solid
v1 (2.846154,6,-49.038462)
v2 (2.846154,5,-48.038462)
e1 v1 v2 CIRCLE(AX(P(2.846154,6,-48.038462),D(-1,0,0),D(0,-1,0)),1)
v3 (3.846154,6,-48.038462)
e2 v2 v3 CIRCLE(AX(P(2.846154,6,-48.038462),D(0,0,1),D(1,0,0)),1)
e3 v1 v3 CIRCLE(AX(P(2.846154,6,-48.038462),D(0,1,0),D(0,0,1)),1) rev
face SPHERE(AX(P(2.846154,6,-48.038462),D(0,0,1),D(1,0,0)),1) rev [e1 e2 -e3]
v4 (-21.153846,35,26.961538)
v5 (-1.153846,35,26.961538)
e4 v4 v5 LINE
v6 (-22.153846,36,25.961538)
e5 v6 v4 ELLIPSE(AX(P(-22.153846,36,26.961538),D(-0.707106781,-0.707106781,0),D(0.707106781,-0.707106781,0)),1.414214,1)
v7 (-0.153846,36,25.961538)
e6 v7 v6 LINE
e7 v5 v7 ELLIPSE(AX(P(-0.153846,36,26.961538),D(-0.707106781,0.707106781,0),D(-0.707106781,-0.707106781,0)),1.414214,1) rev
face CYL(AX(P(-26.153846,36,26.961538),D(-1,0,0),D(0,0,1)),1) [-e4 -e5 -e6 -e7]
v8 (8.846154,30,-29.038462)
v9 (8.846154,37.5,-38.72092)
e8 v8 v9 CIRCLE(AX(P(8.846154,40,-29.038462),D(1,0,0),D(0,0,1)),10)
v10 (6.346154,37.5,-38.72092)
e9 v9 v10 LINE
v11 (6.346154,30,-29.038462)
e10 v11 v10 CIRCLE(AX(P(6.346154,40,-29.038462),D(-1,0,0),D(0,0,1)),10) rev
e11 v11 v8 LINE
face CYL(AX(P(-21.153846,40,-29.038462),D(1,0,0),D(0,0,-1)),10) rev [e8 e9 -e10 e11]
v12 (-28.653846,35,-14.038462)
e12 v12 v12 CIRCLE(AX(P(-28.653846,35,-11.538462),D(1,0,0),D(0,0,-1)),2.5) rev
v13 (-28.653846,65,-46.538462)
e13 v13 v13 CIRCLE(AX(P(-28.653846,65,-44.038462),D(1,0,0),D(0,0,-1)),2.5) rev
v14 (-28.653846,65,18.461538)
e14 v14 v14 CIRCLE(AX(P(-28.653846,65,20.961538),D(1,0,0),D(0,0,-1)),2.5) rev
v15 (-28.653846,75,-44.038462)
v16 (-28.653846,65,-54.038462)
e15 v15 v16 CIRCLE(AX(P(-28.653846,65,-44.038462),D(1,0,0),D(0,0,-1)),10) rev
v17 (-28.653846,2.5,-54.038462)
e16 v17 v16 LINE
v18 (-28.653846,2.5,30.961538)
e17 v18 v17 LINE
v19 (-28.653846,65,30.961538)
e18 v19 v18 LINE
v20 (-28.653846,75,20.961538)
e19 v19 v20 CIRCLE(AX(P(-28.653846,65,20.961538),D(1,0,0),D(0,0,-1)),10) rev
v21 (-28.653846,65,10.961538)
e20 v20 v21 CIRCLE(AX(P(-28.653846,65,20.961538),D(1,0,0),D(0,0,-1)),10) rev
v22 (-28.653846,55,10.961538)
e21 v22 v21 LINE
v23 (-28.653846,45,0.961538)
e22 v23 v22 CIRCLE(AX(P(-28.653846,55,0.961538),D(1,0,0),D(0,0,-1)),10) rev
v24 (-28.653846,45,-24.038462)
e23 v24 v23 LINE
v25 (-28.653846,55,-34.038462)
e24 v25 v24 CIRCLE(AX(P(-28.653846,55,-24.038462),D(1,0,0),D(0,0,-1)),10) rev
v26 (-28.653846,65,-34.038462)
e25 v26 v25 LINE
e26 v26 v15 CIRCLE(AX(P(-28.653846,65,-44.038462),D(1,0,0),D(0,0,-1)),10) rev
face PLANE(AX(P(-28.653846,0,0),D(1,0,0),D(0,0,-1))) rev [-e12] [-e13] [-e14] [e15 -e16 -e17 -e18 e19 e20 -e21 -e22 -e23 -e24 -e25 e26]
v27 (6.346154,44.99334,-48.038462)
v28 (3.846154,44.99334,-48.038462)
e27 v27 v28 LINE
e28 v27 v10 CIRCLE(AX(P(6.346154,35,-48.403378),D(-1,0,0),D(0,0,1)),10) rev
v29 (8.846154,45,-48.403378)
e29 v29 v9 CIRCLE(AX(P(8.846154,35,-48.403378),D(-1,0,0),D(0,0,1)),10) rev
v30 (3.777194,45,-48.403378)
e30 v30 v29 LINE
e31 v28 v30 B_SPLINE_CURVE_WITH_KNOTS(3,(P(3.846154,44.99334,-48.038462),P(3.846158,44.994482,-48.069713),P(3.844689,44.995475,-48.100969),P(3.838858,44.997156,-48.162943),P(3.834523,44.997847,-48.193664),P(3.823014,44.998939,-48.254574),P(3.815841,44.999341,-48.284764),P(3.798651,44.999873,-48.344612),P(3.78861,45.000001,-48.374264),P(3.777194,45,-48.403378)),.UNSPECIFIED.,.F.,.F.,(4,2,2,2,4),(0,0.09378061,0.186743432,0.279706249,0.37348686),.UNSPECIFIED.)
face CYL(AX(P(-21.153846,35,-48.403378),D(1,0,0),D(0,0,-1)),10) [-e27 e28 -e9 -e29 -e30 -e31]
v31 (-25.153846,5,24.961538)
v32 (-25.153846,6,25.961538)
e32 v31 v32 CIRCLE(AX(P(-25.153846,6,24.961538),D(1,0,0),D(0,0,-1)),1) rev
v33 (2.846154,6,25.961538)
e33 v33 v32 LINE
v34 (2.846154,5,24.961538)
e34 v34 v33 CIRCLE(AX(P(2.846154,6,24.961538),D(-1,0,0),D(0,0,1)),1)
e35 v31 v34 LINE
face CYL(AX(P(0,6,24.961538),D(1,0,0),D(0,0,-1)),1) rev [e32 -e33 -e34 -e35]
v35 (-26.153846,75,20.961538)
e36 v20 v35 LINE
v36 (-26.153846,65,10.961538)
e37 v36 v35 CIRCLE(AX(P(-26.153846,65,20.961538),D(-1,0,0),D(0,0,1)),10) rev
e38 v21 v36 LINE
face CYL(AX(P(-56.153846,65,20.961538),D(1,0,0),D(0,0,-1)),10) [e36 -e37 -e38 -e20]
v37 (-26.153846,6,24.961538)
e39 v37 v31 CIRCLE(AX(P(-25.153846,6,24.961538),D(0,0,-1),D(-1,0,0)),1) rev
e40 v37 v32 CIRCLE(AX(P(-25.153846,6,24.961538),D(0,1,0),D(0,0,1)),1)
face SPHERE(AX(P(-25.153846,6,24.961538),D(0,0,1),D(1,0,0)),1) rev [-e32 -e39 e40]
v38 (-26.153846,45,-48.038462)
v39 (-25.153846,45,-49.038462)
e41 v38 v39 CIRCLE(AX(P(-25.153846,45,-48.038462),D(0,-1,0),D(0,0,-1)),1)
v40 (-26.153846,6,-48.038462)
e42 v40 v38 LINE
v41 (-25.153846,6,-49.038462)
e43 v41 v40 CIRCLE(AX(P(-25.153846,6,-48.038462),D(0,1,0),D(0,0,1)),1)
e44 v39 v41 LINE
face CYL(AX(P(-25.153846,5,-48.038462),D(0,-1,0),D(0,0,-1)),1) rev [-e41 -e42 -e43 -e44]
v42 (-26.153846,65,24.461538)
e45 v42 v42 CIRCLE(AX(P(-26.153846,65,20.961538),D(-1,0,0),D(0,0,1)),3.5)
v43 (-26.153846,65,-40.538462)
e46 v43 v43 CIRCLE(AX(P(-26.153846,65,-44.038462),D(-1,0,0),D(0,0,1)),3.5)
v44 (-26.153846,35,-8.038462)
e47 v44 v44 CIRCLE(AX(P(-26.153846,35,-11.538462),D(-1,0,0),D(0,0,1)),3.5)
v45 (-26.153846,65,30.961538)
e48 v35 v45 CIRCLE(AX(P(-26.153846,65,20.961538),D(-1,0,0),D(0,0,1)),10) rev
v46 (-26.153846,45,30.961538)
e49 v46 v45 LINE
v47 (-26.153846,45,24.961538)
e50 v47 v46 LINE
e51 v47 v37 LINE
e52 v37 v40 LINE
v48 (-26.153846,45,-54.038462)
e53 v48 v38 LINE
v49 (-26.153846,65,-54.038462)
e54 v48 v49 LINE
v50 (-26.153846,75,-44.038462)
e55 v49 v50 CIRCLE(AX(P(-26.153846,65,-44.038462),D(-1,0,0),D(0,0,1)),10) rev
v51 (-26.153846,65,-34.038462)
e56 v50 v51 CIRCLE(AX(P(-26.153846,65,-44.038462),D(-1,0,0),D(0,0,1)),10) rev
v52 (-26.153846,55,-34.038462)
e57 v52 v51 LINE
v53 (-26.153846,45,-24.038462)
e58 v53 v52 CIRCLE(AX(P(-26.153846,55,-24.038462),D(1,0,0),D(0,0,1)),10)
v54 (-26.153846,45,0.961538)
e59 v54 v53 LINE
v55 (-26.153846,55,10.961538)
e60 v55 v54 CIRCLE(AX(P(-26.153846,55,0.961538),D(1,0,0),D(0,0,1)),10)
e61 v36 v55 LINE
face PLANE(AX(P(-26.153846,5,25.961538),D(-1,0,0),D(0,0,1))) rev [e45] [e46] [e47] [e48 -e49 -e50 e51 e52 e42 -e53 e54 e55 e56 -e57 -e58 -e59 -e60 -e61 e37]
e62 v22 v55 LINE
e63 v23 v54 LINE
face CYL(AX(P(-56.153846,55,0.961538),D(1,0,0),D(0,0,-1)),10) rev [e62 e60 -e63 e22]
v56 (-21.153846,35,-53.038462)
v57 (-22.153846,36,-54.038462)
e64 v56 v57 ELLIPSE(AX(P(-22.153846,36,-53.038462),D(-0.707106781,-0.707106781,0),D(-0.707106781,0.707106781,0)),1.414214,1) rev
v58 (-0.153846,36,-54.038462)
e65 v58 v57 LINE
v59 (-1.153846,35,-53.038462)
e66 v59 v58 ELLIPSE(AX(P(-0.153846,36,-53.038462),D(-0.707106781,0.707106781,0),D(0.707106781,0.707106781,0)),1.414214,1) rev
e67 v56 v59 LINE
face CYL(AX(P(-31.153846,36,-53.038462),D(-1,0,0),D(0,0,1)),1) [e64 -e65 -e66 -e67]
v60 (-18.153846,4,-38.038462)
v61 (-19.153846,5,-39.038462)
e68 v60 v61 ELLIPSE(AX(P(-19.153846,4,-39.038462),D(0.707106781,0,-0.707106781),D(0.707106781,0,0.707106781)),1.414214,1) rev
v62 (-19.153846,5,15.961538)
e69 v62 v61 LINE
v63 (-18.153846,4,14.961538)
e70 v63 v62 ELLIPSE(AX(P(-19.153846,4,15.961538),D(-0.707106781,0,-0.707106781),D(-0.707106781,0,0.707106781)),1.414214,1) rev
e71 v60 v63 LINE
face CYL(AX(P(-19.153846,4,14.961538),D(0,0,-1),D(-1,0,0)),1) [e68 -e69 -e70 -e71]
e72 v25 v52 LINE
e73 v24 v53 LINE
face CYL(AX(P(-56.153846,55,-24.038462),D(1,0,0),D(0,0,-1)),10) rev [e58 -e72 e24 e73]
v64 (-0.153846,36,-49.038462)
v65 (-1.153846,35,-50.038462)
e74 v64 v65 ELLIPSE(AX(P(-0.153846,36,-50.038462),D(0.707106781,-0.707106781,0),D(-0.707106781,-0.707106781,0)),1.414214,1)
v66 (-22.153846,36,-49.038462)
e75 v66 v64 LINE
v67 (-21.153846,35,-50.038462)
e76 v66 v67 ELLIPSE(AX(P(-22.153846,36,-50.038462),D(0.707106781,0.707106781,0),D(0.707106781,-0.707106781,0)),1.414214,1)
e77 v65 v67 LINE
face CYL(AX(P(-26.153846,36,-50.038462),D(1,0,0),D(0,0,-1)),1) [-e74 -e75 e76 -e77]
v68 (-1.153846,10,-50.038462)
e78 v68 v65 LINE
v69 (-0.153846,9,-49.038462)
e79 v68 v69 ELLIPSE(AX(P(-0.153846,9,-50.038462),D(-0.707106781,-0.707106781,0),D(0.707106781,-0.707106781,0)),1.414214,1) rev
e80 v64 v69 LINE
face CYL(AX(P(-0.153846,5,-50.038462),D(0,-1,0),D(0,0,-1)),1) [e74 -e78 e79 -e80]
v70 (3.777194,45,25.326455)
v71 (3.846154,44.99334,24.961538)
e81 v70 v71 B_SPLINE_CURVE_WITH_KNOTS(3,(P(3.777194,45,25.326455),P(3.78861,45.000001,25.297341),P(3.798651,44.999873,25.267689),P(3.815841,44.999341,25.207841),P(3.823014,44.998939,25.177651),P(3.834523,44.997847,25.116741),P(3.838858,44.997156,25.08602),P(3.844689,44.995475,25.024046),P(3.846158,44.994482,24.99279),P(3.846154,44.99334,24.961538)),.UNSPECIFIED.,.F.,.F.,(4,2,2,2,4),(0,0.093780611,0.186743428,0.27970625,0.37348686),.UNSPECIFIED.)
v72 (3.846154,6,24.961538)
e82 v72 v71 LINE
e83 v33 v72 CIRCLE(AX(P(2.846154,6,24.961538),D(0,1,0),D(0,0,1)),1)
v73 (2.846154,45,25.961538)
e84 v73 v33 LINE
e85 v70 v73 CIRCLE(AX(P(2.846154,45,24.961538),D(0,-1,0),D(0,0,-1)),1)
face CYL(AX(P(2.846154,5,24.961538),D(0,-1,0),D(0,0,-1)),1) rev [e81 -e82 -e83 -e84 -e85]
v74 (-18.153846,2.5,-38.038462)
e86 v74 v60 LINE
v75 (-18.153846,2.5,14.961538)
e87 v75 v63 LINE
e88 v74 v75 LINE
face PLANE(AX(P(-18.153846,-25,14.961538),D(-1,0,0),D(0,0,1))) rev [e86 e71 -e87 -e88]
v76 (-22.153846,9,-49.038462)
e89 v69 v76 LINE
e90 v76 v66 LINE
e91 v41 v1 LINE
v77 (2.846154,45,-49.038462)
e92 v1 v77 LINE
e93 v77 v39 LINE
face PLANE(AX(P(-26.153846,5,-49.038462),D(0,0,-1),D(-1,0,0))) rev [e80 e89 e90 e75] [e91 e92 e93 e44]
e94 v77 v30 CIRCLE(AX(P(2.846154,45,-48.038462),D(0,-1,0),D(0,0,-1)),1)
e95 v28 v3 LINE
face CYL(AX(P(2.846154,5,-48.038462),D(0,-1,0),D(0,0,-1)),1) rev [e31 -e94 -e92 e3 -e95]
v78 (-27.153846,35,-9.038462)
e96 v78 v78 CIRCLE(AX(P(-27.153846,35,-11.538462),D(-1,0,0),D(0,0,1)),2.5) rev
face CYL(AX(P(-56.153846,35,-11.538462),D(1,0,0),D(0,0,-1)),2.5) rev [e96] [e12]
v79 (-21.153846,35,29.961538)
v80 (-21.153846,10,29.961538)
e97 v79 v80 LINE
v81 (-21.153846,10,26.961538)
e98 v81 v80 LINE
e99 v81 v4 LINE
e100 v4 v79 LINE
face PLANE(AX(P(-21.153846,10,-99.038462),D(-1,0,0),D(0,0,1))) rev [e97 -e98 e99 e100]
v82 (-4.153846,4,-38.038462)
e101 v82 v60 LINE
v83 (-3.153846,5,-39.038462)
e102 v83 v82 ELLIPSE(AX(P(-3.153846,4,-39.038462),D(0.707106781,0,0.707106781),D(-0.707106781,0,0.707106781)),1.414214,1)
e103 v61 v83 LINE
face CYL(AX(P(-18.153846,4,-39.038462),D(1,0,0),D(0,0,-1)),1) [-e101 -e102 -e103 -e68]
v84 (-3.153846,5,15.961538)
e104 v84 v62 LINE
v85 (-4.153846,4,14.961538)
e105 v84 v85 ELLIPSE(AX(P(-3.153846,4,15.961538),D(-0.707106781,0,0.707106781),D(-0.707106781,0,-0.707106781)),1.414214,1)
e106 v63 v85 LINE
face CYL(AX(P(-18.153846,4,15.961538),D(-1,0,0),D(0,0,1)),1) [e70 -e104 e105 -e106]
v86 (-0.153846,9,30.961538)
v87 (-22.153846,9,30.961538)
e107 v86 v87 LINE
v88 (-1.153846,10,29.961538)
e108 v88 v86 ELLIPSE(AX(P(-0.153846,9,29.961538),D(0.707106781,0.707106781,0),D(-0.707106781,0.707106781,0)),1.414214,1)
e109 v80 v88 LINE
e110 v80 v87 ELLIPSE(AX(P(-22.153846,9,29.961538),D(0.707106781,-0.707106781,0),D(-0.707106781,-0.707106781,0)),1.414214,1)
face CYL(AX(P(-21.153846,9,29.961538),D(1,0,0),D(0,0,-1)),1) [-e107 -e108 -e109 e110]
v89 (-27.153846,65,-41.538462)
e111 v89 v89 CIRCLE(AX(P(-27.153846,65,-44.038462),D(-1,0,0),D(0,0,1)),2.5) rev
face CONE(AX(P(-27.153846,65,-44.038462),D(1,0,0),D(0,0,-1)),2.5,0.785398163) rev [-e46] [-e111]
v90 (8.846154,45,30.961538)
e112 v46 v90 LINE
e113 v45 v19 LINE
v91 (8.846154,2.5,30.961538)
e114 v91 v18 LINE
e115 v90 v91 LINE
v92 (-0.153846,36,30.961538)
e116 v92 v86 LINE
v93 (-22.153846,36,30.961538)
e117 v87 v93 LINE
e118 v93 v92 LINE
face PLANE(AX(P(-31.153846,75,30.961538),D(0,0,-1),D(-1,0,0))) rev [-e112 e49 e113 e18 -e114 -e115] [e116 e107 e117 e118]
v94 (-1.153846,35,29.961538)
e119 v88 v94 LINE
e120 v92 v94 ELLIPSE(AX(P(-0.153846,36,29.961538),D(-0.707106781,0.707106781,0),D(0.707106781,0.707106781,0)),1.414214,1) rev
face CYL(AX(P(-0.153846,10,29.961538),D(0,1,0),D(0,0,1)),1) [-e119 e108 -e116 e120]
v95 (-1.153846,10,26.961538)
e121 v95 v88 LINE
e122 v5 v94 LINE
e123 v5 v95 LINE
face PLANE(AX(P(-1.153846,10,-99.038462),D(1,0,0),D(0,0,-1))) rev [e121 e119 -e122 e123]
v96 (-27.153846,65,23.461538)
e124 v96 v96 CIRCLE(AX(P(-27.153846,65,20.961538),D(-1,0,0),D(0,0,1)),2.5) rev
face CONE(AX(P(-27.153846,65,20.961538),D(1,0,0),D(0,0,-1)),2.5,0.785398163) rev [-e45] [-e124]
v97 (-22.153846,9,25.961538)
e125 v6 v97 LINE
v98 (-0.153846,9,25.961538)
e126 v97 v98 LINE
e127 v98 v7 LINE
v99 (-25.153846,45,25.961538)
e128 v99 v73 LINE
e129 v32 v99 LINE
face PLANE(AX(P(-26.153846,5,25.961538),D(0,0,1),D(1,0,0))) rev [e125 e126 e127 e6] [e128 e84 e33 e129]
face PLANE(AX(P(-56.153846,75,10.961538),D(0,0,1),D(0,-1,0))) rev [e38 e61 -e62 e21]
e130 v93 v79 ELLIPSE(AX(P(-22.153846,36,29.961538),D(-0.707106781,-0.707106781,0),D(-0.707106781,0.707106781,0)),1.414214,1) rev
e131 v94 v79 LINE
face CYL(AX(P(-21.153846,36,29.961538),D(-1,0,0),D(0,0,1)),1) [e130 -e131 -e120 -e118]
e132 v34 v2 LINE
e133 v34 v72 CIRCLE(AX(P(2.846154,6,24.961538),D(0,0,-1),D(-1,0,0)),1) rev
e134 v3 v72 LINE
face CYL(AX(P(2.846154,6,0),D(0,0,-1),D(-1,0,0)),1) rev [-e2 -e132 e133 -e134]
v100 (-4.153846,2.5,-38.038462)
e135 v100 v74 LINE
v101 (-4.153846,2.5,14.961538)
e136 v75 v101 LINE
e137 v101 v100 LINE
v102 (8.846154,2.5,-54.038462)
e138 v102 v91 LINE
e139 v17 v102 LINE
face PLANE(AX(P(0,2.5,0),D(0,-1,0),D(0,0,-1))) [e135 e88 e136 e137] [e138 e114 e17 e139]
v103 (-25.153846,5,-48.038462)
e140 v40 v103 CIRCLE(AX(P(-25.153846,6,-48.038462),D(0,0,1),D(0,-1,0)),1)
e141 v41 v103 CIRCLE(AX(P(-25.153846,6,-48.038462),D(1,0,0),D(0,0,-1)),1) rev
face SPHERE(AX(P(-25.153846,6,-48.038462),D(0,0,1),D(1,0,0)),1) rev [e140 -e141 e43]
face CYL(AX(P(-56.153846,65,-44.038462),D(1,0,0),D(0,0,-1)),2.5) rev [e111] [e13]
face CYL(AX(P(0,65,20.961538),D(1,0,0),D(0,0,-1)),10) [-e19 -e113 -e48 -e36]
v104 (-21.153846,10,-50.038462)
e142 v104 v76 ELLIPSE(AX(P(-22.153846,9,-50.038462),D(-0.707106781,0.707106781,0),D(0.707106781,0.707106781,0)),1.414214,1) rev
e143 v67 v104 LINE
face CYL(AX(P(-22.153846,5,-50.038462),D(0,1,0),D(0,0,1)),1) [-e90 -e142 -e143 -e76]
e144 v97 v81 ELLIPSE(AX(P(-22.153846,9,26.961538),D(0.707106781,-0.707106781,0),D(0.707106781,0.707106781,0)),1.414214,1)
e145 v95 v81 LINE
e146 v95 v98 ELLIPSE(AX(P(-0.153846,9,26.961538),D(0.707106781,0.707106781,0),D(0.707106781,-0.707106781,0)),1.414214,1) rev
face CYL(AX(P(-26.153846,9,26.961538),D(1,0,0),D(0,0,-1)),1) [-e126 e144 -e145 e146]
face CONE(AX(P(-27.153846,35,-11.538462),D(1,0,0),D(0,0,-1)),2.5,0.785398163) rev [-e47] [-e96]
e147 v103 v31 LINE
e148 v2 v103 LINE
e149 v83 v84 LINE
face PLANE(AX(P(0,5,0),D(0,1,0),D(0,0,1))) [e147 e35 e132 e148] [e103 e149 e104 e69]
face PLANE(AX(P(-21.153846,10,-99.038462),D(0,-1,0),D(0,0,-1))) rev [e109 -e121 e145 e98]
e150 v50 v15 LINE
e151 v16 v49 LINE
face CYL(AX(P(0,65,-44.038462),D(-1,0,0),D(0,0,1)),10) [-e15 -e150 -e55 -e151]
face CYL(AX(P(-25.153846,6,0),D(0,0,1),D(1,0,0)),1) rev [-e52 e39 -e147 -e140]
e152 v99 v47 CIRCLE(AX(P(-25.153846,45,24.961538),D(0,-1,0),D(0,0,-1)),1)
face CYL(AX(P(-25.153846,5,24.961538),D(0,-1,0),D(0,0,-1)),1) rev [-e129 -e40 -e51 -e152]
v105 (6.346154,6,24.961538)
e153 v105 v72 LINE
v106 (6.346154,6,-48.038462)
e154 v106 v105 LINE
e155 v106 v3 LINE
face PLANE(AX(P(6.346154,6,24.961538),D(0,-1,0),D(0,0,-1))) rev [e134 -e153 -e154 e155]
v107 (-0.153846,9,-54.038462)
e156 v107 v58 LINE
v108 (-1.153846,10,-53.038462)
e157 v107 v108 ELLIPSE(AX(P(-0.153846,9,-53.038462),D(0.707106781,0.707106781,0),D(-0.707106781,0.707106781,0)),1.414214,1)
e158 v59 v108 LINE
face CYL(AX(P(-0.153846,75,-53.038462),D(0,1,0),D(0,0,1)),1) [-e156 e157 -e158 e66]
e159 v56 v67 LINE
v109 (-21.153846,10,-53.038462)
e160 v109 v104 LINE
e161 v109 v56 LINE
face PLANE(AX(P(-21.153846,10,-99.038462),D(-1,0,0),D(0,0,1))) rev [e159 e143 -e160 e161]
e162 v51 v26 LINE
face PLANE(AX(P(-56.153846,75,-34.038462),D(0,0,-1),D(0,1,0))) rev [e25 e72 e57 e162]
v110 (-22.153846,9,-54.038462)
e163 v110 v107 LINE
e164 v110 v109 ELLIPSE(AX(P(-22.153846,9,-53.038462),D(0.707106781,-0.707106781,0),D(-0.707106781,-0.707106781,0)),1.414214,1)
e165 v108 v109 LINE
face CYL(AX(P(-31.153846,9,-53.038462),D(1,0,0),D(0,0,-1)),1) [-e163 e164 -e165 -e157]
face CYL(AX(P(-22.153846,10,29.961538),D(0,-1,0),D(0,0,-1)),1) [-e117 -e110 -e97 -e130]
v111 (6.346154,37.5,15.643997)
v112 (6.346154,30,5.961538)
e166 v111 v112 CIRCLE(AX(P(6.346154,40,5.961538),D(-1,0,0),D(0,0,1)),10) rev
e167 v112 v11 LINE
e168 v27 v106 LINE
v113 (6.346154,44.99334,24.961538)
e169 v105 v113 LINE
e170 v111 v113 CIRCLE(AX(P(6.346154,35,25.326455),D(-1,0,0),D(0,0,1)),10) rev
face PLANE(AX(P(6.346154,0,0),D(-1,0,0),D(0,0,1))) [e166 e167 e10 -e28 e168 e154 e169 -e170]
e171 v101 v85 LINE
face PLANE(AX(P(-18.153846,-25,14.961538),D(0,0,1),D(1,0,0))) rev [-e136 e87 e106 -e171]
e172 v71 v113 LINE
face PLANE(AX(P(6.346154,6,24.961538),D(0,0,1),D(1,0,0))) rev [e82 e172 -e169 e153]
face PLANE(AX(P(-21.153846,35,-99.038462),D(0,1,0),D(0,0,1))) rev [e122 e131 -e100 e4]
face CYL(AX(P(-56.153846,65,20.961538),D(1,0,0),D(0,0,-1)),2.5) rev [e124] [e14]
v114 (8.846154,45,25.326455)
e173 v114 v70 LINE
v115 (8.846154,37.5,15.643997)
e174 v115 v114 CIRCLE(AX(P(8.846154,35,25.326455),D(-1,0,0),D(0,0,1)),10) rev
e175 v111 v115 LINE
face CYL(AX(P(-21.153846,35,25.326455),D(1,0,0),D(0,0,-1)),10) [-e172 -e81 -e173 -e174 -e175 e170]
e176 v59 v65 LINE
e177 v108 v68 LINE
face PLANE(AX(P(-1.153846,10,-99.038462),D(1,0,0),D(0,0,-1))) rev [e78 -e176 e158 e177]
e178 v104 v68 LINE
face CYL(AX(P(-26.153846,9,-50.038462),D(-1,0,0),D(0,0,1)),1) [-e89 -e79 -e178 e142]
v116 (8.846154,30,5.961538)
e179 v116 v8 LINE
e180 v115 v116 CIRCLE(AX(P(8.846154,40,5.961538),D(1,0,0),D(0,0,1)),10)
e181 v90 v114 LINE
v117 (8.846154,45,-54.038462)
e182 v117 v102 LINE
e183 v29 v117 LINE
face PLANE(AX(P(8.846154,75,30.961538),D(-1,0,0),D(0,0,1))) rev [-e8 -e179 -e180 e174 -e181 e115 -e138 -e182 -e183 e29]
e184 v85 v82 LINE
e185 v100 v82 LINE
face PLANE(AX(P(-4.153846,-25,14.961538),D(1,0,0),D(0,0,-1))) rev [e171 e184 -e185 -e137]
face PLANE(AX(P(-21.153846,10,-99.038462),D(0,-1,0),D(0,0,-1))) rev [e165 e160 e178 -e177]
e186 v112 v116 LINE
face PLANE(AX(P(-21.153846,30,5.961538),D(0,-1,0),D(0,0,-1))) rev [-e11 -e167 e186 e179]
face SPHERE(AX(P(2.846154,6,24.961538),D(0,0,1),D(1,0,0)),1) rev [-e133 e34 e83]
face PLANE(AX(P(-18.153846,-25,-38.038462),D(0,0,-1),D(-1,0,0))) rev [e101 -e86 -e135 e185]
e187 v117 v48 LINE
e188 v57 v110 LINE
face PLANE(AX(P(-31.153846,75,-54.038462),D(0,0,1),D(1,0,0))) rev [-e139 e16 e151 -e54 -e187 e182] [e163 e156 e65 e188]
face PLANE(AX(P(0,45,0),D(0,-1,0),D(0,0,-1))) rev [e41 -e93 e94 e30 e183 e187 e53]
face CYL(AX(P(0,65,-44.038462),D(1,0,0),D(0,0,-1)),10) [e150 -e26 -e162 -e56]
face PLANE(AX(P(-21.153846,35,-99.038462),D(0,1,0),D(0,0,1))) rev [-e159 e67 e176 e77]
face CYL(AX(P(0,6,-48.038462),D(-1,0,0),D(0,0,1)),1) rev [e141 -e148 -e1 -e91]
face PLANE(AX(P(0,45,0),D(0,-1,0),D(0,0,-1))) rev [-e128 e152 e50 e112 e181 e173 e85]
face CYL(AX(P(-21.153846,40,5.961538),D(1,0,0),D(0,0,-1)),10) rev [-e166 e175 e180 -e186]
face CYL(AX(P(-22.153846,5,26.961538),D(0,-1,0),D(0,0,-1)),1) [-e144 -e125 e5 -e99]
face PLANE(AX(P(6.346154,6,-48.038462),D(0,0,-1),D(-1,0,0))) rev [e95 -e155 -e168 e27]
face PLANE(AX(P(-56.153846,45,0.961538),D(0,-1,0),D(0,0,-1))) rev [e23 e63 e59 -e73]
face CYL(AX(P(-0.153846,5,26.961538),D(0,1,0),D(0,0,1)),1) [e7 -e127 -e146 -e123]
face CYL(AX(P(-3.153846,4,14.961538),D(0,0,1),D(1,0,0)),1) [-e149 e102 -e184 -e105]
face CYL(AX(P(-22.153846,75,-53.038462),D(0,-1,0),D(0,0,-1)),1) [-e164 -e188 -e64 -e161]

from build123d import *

# Parameters (mm, degrees)
SKETCH1_W           = 40
SKETCH1_H           = 85
BOSS_EXTRUDE1_DEPTH = 75
SKETCH3_OUTSIDE_W   = 66.042
SKETCH3_OUTSIDE_H   = 111.042
SKETCH3_OUTSIDE_W_2 = 40
SKETCH3_OUTSIDE_H_2 = 85
SKETCH3_OUTSIDE_W_3 = 30
SKETCH3_OUTSIDE_H_3 = 75
CUT_EXTRUDE2_DEPTH  = 70
SKETCH4_W           = 35
SKETCH4_H           = 85
CUT_EXTRUDE3_DEPTH  = 30
FILLET1_R           = 10
SKETCH5_R           = 2.5
CUT_EXTRUDE4_DEPTH  = 30
CHAMFER1_SIZE       = 1
CUT_EXTRUDE5_DEPTH  = 30
FILLET2_R           = 1
FILLET3_R           = 10
SKETCH7_W           = 14
SKETCH7_H           = 53
CUT_EXTRUDE6_DEPTH  = 30
FILLET4_R           = 1
CUT_EXTRUDE7_DEPTH  = 30
FILLET5_R           = 10
SKETCH9_R           = 2.5
CUT_EXTRUDE8_DEPTH  = 30
CHAMFER2_SIZE       = 1
SKETCH10_W          = 20
SKETCH10_H          = 25
CUT_EXTRUDE9_DEPTH  = 130
FILLET6_R           = 1
FILLET7_R           = 1
SKETCH12_W          = 99.145482585
SKETCH12_H          = 91.596568109
CUT_EXTRUDE11_DEPTH = 2.5
SKETCH13_W          = 51.22831634
SKETCH13_H          = 105.793314496
CUT_EXTRUDE12_DEPTH = 2.5
SKETCH14_W          = 73
SKETCH14_H          = 70.039653543
CUT_EXTRUDE13_DEPTH = 2.5


# Some blends are built 0.0001 mm under size
with BuildPart() as part:
    # Sketch1 → Boss-Extrude1 (new body)
    with BuildSketch(Plane(origin=(0, 0, 0), x_dir=(1, 0, 0), z_dir=(0, 1, 0))):
        with Locations((-11.153846154, 11.538461538)):
            Rectangle(SKETCH1_W, SKETCH1_H)
    extrude(amount=BOSS_EXTRUDE1_DEPTH)

    # Sketch3 outside → Cut-Extrude2 (cut)
    # profile 1 of 2: a face of its own
    with BuildSketch(Plane(origin=(0, 75, 0), x_dir=(1, 0, 0), z_dir=(0, 1, 0))):
        with Locations((-11.154, 11.538)):
            Rectangle(SKETCH3_OUTSIDE_W, SKETCH3_OUTSIDE_H)
        with Locations((-11.153846154, 11.538461538)):
            Rectangle(SKETCH3_OUTSIDE_W_2, SKETCH3_OUTSIDE_H_2, mode=Mode.SUBTRACT)
    # profile 2 of 2: a face of its own
    with BuildSketch(Plane(origin=(0, 75, 0), x_dir=(1, 0, 0), z_dir=(0, 1, 0))):
        with Locations((-11.153846154, 11.538461538)):
            Rectangle(SKETCH3_OUTSIDE_W_3, SKETCH3_OUTSIDE_H_3)
    extrude(amount=-CUT_EXTRUDE2_DEPTH, mode=Mode.SUBTRACT)

    # Sketch4 → Cut-Extrude3 (cut)
    with BuildSketch(Plane(origin=(0, 75, 0), x_dir=(1, 0, 0), z_dir=(0, 1, 0))):
        with Locations((-8.653846154, 11.538461538)):
            Rectangle(SKETCH4_W, SKETCH4_H)
    extrude(amount=-CUT_EXTRUDE3_DEPTH, mode=Mode.SUBTRACT)

    # Fillet1
    fillet1_edges = [part.edges().sort_by_distance(p)[0] for p in [
        (-28.653846154, 75, -54.038461538),
        (-28.653846154, 75, 30.961538462),
    ]]
    fillet(fillet1_edges, radius=FILLET1_R)

    # Sketch5 → Cut-Extrude4 (cut)
    with BuildSketch(Plane(origin=(-26.153846154, 0, 0), x_dir=(0, 0, -1), z_dir=(1, 0, 0))):
        with Locations((-20.961538462, 65)):
            Circle(SKETCH5_R)
        with Locations((44.038461538, 65)):
            Circle(SKETCH5_R)
    extrude(amount=-CUT_EXTRUDE4_DEPTH, mode=Mode.SUBTRACT)

    # Chamfer1
    chamfer1_edges = [part.edges().sort_by_distance(p)[0] for p in [
        (-26.153846154, 65, 23.461538462),
        (-26.153846154, 65, -41.538461538),
    ]]
    chamfer(chamfer1_edges, length=CHAMFER1_SIZE)

    # Sketch6 → Cut-Extrude5 (cut)
    with BuildSketch(Plane(origin=(8.846153846, 0, 0), x_dir=(0, 0, -1), z_dir=(1, 0, 0))):
        with BuildLine():
            Line((-15.961538462, 45), (39.038461538, 45))
            Line((39.038461538, 45), (39.038461538, 40))
            ThreePointArc((39.038461538, 40), (36.10952935, 32.928932188), (29.038461538, 30))
            Line((29.038461538, 30), (-5.961538462, 30))
            ThreePointArc((-5.961538462, 30), (-13.032606273, 32.928932188), (-15.961538462, 40))
            Line((-15.961538462, 40), (-15.961538462, 45))
        make_face()
    extrude(amount=-CUT_EXTRUDE5_DEPTH, mode=Mode.SUBTRACT)

    # Fillet2
    fillet2_edges = [part.edges().sort_by_distance(p)[0] for p in [
        (-11.153846154, 5, 25.961538462),
        (3.846153846, 25, 25.961538462),
        (-26.153846154, 5, -11.538461538),
        (-26.153846154, 25, 25.961538462),
        (-11.153846154, 5, -49.038461538),
        (-26.153846154, 25, -49.038461538),
        (3.846153846, 5, -11.538461538),
        (3.846153846, 25, -49.038461538),
    ]]
    fillet(fillet2_edges, radius=FILLET2_R)

    # Fillet3
    # the kernel refuses this fillet: 10 mm, written as the material it takes off along each edge
    with BuildSketch(Plane(origin=(32.258445674, 45, 15.961538462), x_dir=(0, -0.9991049126334702, -0.04230098759681175), z_dir=(-1, 0, 0))) as fillet3_piece_1:
        with BuildLine():
            CenterArc((9.5949039, 9.779544188), FILLET3_R, 182.424391449, 75.522487814)
            Line((-0.396145226, 9.356534312), (-1.395250139, 9.314233325))
            Line((-1.395250139, 9.314233325), (-0.999104913, -0.042300988))
            Line((-0.999104913, -0.042300988), (0.042300988, -0.999104913))
            ThreePointArc((0.042300988, -0.999104913), (5.037825551, -0.787599975), (7.297900696, -0.977954419))
            Line((7.297900696, -0.977954419), (7.506719169, 0))
        make_face()
    extrude(amount=51.824583655, mode=Mode.SUBTRACT)
    with BuildSketch(Plane(origin=(32.258445674, 45, -39.038461538), x_dir=(0, -0.9991049126334705, 0.04230098759681053), z_dir=(-1, 0, 0))) as fillet3_piece_2:
        with BuildLine():
            CenterArc((9.5949039, -9.779544188), FILLET3_R, 102.053120737, 75.522487814)
            Line((-0.396145226, -9.356534312), (-1.395250139, -9.314233325))
            Line((-1.395250139, -9.314233325), (-0.999104913, 0.042300988))
            Line((-0.999104913, 0.042300988), (0.042300988, 0.999104913))
            ThreePointArc((0.042300988, 0.999104913), (5.037825551, 0.787599975), (7.297900696, 0.977954419))
            Line((7.297900696, 0.977954419), (7.506719169, 0))
        make_face()
    extrude(amount=51.824583655, mode=Mode.SUBTRACT)

    # Sketch7 → Cut-Extrude6 (cut)
    with BuildSketch(Plane(origin=(0, 5, 0), x_dir=(1, 0, 0), z_dir=(0, 1, 0))):
        with Locations((-11.153846154, 11.538461538)):
            Rectangle(SKETCH7_W, SKETCH7_H)
    extrude(amount=-CUT_EXTRUDE6_DEPTH, mode=Mode.SUBTRACT)

    # Fillet4
    fillet4_edges = [part.edges().sort_by_distance(p)[0] for p in [
        (-18.153846154, 5, -11.538461538),
        (-11.153846154, 5, 14.961538462),
        (-4.153846154, 5, -11.538461538),
        (-11.153846154, 5, -38.038461538),
    ]]
    fillet(fillet4_edges, radius=FILLET4_R)

    # Sketch8 → Cut-Extrude7 (cut)
    with BuildSketch(Plane(origin=(-26.153846154, 0, 0), x_dir=(0, 0, -1), z_dir=(1, 0, 0))):
        with BuildLine():
            Line((-10.961538462, 75), (34.038461538, 75))
            Line((34.038461538, 75), (34.038461538, 55))
            ThreePointArc((34.038461538, 55), (31.10952935, 47.928932188), (24.038461538, 45))
            Line((24.038461538, 45), (-0.961538462, 45))
            ThreePointArc((-0.961538462, 45), (-8.032606273, 47.928932188), (-10.961538462, 55))
            Line((-10.961538462, 55), (-10.961538462, 75))
        make_face()
    extrude(amount=-CUT_EXTRUDE7_DEPTH, mode=Mode.SUBTRACT)

    # Fillet5
    fillet5_edges = [part.edges().sort_by_distance(p)[0] for p in [
        (-28.653846154, 75, -34.038461538),
        (-28.653846154, 75, 10.961538462),
    ]]
    fillet(fillet5_edges, radius=FILLET5_R - 0.0001)  # a hair under: the kernel refuses the full size

    # Sketch9 → Cut-Extrude8 (cut)
    with BuildSketch(Plane(origin=(-26.153846154, 0, 0), x_dir=(0, 0, -1), z_dir=(1, 0, 0))):
        with Locations((11.538461538, 35)):
            Circle(SKETCH9_R)
    extrude(amount=-CUT_EXTRUDE8_DEPTH, mode=Mode.SUBTRACT)

    # Chamfer2
    chamfer2_edges = [part.edges().sort_by_distance(p)[0] for p in [
        (-26.153846154, 35, -9.038461538),
    ]]
    chamfer(chamfer2_edges, length=CHAMFER2_SIZE)

    # Sketch10 → Cut-Extrude9 (cut)
    with BuildSketch(Plane.XY.offset(30.961538462)):
        with Locations((-11.153846154, 22.5)):
            Rectangle(SKETCH10_W, SKETCH10_H)
    extrude(amount=-CUT_EXTRUDE9_DEPTH, mode=Mode.SUBTRACT)

    # Fillet6
    fillet6_edges = [part.edges().sort_by_distance(p)[0] for p in [
        (-21.153846154, 22.5, 25.961538462),
        (-11.153846154, 35, 25.961538462),
        (-1.153846154, 22.5, 25.961538462),
        (-11.153846154, 10, 25.961538462),
        (-21.153846154, 22.5, 30.961538462),
        (-11.153846154, 10, 30.961538462),
        (-1.153846154, 22.5, 30.961538462),
        (-11.153846154, 35, 30.961538462),
    ]]
    fillet(fillet6_edges, radius=FILLET6_R)

    # Fillet7
    fillet7_edges = [part.edges().sort_by_distance(p)[0] for p in [
        (-11.153846154, 10, -49.038461538),
        (-1.153846154, 22.5, -49.038461538),
        (-11.153846154, 35, -49.038461538),
        (-21.153846154, 22.5, -49.038461538),
        (-21.153846154, 22.5, -54.038461538),
        (-11.153846154, 35, -54.038461538),
        (-1.153846154, 22.5, -54.038461538),
        (-11.153846154, 10, -54.038461538),
    ]]
    fillet(fillet7_edges, radius=FILLET7_R)

    # Sketch12 → Cut-Extrude11 (cut)
    with BuildSketch(Plane.ZY.offset(31.153846154)):
        with Locations((-8.86612538, 45.798284055)):
            Rectangle(SKETCH12_W, SKETCH12_H)
    extrude(amount=-CUT_EXTRUDE11_DEPTH, mode=Mode.SUBTRACT)

    # Sketch13 → Cut-Extrude12 (cut)
    with BuildSketch(Plane.XZ):
        with Locations((-8.23266401, -21.935118786)):
            Rectangle(SKETCH13_W, SKETCH13_H)
    extrude(amount=-CUT_EXTRUDE12_DEPTH, mode=Mode.SUBTRACT)

    # Sketch14 → Cut-Extrude13 (cut)
    with BuildSketch(Plane.ZY.offset(-3.846153846)):
        with Locations((-11.538461538, 41.019826772)):
            Rectangle(SKETCH14_W, SKETCH14_H)
    extrude(amount=-CUT_EXTRUDE13_DEPTH, mode=Mode.SUBTRACT)


solid = part.part
